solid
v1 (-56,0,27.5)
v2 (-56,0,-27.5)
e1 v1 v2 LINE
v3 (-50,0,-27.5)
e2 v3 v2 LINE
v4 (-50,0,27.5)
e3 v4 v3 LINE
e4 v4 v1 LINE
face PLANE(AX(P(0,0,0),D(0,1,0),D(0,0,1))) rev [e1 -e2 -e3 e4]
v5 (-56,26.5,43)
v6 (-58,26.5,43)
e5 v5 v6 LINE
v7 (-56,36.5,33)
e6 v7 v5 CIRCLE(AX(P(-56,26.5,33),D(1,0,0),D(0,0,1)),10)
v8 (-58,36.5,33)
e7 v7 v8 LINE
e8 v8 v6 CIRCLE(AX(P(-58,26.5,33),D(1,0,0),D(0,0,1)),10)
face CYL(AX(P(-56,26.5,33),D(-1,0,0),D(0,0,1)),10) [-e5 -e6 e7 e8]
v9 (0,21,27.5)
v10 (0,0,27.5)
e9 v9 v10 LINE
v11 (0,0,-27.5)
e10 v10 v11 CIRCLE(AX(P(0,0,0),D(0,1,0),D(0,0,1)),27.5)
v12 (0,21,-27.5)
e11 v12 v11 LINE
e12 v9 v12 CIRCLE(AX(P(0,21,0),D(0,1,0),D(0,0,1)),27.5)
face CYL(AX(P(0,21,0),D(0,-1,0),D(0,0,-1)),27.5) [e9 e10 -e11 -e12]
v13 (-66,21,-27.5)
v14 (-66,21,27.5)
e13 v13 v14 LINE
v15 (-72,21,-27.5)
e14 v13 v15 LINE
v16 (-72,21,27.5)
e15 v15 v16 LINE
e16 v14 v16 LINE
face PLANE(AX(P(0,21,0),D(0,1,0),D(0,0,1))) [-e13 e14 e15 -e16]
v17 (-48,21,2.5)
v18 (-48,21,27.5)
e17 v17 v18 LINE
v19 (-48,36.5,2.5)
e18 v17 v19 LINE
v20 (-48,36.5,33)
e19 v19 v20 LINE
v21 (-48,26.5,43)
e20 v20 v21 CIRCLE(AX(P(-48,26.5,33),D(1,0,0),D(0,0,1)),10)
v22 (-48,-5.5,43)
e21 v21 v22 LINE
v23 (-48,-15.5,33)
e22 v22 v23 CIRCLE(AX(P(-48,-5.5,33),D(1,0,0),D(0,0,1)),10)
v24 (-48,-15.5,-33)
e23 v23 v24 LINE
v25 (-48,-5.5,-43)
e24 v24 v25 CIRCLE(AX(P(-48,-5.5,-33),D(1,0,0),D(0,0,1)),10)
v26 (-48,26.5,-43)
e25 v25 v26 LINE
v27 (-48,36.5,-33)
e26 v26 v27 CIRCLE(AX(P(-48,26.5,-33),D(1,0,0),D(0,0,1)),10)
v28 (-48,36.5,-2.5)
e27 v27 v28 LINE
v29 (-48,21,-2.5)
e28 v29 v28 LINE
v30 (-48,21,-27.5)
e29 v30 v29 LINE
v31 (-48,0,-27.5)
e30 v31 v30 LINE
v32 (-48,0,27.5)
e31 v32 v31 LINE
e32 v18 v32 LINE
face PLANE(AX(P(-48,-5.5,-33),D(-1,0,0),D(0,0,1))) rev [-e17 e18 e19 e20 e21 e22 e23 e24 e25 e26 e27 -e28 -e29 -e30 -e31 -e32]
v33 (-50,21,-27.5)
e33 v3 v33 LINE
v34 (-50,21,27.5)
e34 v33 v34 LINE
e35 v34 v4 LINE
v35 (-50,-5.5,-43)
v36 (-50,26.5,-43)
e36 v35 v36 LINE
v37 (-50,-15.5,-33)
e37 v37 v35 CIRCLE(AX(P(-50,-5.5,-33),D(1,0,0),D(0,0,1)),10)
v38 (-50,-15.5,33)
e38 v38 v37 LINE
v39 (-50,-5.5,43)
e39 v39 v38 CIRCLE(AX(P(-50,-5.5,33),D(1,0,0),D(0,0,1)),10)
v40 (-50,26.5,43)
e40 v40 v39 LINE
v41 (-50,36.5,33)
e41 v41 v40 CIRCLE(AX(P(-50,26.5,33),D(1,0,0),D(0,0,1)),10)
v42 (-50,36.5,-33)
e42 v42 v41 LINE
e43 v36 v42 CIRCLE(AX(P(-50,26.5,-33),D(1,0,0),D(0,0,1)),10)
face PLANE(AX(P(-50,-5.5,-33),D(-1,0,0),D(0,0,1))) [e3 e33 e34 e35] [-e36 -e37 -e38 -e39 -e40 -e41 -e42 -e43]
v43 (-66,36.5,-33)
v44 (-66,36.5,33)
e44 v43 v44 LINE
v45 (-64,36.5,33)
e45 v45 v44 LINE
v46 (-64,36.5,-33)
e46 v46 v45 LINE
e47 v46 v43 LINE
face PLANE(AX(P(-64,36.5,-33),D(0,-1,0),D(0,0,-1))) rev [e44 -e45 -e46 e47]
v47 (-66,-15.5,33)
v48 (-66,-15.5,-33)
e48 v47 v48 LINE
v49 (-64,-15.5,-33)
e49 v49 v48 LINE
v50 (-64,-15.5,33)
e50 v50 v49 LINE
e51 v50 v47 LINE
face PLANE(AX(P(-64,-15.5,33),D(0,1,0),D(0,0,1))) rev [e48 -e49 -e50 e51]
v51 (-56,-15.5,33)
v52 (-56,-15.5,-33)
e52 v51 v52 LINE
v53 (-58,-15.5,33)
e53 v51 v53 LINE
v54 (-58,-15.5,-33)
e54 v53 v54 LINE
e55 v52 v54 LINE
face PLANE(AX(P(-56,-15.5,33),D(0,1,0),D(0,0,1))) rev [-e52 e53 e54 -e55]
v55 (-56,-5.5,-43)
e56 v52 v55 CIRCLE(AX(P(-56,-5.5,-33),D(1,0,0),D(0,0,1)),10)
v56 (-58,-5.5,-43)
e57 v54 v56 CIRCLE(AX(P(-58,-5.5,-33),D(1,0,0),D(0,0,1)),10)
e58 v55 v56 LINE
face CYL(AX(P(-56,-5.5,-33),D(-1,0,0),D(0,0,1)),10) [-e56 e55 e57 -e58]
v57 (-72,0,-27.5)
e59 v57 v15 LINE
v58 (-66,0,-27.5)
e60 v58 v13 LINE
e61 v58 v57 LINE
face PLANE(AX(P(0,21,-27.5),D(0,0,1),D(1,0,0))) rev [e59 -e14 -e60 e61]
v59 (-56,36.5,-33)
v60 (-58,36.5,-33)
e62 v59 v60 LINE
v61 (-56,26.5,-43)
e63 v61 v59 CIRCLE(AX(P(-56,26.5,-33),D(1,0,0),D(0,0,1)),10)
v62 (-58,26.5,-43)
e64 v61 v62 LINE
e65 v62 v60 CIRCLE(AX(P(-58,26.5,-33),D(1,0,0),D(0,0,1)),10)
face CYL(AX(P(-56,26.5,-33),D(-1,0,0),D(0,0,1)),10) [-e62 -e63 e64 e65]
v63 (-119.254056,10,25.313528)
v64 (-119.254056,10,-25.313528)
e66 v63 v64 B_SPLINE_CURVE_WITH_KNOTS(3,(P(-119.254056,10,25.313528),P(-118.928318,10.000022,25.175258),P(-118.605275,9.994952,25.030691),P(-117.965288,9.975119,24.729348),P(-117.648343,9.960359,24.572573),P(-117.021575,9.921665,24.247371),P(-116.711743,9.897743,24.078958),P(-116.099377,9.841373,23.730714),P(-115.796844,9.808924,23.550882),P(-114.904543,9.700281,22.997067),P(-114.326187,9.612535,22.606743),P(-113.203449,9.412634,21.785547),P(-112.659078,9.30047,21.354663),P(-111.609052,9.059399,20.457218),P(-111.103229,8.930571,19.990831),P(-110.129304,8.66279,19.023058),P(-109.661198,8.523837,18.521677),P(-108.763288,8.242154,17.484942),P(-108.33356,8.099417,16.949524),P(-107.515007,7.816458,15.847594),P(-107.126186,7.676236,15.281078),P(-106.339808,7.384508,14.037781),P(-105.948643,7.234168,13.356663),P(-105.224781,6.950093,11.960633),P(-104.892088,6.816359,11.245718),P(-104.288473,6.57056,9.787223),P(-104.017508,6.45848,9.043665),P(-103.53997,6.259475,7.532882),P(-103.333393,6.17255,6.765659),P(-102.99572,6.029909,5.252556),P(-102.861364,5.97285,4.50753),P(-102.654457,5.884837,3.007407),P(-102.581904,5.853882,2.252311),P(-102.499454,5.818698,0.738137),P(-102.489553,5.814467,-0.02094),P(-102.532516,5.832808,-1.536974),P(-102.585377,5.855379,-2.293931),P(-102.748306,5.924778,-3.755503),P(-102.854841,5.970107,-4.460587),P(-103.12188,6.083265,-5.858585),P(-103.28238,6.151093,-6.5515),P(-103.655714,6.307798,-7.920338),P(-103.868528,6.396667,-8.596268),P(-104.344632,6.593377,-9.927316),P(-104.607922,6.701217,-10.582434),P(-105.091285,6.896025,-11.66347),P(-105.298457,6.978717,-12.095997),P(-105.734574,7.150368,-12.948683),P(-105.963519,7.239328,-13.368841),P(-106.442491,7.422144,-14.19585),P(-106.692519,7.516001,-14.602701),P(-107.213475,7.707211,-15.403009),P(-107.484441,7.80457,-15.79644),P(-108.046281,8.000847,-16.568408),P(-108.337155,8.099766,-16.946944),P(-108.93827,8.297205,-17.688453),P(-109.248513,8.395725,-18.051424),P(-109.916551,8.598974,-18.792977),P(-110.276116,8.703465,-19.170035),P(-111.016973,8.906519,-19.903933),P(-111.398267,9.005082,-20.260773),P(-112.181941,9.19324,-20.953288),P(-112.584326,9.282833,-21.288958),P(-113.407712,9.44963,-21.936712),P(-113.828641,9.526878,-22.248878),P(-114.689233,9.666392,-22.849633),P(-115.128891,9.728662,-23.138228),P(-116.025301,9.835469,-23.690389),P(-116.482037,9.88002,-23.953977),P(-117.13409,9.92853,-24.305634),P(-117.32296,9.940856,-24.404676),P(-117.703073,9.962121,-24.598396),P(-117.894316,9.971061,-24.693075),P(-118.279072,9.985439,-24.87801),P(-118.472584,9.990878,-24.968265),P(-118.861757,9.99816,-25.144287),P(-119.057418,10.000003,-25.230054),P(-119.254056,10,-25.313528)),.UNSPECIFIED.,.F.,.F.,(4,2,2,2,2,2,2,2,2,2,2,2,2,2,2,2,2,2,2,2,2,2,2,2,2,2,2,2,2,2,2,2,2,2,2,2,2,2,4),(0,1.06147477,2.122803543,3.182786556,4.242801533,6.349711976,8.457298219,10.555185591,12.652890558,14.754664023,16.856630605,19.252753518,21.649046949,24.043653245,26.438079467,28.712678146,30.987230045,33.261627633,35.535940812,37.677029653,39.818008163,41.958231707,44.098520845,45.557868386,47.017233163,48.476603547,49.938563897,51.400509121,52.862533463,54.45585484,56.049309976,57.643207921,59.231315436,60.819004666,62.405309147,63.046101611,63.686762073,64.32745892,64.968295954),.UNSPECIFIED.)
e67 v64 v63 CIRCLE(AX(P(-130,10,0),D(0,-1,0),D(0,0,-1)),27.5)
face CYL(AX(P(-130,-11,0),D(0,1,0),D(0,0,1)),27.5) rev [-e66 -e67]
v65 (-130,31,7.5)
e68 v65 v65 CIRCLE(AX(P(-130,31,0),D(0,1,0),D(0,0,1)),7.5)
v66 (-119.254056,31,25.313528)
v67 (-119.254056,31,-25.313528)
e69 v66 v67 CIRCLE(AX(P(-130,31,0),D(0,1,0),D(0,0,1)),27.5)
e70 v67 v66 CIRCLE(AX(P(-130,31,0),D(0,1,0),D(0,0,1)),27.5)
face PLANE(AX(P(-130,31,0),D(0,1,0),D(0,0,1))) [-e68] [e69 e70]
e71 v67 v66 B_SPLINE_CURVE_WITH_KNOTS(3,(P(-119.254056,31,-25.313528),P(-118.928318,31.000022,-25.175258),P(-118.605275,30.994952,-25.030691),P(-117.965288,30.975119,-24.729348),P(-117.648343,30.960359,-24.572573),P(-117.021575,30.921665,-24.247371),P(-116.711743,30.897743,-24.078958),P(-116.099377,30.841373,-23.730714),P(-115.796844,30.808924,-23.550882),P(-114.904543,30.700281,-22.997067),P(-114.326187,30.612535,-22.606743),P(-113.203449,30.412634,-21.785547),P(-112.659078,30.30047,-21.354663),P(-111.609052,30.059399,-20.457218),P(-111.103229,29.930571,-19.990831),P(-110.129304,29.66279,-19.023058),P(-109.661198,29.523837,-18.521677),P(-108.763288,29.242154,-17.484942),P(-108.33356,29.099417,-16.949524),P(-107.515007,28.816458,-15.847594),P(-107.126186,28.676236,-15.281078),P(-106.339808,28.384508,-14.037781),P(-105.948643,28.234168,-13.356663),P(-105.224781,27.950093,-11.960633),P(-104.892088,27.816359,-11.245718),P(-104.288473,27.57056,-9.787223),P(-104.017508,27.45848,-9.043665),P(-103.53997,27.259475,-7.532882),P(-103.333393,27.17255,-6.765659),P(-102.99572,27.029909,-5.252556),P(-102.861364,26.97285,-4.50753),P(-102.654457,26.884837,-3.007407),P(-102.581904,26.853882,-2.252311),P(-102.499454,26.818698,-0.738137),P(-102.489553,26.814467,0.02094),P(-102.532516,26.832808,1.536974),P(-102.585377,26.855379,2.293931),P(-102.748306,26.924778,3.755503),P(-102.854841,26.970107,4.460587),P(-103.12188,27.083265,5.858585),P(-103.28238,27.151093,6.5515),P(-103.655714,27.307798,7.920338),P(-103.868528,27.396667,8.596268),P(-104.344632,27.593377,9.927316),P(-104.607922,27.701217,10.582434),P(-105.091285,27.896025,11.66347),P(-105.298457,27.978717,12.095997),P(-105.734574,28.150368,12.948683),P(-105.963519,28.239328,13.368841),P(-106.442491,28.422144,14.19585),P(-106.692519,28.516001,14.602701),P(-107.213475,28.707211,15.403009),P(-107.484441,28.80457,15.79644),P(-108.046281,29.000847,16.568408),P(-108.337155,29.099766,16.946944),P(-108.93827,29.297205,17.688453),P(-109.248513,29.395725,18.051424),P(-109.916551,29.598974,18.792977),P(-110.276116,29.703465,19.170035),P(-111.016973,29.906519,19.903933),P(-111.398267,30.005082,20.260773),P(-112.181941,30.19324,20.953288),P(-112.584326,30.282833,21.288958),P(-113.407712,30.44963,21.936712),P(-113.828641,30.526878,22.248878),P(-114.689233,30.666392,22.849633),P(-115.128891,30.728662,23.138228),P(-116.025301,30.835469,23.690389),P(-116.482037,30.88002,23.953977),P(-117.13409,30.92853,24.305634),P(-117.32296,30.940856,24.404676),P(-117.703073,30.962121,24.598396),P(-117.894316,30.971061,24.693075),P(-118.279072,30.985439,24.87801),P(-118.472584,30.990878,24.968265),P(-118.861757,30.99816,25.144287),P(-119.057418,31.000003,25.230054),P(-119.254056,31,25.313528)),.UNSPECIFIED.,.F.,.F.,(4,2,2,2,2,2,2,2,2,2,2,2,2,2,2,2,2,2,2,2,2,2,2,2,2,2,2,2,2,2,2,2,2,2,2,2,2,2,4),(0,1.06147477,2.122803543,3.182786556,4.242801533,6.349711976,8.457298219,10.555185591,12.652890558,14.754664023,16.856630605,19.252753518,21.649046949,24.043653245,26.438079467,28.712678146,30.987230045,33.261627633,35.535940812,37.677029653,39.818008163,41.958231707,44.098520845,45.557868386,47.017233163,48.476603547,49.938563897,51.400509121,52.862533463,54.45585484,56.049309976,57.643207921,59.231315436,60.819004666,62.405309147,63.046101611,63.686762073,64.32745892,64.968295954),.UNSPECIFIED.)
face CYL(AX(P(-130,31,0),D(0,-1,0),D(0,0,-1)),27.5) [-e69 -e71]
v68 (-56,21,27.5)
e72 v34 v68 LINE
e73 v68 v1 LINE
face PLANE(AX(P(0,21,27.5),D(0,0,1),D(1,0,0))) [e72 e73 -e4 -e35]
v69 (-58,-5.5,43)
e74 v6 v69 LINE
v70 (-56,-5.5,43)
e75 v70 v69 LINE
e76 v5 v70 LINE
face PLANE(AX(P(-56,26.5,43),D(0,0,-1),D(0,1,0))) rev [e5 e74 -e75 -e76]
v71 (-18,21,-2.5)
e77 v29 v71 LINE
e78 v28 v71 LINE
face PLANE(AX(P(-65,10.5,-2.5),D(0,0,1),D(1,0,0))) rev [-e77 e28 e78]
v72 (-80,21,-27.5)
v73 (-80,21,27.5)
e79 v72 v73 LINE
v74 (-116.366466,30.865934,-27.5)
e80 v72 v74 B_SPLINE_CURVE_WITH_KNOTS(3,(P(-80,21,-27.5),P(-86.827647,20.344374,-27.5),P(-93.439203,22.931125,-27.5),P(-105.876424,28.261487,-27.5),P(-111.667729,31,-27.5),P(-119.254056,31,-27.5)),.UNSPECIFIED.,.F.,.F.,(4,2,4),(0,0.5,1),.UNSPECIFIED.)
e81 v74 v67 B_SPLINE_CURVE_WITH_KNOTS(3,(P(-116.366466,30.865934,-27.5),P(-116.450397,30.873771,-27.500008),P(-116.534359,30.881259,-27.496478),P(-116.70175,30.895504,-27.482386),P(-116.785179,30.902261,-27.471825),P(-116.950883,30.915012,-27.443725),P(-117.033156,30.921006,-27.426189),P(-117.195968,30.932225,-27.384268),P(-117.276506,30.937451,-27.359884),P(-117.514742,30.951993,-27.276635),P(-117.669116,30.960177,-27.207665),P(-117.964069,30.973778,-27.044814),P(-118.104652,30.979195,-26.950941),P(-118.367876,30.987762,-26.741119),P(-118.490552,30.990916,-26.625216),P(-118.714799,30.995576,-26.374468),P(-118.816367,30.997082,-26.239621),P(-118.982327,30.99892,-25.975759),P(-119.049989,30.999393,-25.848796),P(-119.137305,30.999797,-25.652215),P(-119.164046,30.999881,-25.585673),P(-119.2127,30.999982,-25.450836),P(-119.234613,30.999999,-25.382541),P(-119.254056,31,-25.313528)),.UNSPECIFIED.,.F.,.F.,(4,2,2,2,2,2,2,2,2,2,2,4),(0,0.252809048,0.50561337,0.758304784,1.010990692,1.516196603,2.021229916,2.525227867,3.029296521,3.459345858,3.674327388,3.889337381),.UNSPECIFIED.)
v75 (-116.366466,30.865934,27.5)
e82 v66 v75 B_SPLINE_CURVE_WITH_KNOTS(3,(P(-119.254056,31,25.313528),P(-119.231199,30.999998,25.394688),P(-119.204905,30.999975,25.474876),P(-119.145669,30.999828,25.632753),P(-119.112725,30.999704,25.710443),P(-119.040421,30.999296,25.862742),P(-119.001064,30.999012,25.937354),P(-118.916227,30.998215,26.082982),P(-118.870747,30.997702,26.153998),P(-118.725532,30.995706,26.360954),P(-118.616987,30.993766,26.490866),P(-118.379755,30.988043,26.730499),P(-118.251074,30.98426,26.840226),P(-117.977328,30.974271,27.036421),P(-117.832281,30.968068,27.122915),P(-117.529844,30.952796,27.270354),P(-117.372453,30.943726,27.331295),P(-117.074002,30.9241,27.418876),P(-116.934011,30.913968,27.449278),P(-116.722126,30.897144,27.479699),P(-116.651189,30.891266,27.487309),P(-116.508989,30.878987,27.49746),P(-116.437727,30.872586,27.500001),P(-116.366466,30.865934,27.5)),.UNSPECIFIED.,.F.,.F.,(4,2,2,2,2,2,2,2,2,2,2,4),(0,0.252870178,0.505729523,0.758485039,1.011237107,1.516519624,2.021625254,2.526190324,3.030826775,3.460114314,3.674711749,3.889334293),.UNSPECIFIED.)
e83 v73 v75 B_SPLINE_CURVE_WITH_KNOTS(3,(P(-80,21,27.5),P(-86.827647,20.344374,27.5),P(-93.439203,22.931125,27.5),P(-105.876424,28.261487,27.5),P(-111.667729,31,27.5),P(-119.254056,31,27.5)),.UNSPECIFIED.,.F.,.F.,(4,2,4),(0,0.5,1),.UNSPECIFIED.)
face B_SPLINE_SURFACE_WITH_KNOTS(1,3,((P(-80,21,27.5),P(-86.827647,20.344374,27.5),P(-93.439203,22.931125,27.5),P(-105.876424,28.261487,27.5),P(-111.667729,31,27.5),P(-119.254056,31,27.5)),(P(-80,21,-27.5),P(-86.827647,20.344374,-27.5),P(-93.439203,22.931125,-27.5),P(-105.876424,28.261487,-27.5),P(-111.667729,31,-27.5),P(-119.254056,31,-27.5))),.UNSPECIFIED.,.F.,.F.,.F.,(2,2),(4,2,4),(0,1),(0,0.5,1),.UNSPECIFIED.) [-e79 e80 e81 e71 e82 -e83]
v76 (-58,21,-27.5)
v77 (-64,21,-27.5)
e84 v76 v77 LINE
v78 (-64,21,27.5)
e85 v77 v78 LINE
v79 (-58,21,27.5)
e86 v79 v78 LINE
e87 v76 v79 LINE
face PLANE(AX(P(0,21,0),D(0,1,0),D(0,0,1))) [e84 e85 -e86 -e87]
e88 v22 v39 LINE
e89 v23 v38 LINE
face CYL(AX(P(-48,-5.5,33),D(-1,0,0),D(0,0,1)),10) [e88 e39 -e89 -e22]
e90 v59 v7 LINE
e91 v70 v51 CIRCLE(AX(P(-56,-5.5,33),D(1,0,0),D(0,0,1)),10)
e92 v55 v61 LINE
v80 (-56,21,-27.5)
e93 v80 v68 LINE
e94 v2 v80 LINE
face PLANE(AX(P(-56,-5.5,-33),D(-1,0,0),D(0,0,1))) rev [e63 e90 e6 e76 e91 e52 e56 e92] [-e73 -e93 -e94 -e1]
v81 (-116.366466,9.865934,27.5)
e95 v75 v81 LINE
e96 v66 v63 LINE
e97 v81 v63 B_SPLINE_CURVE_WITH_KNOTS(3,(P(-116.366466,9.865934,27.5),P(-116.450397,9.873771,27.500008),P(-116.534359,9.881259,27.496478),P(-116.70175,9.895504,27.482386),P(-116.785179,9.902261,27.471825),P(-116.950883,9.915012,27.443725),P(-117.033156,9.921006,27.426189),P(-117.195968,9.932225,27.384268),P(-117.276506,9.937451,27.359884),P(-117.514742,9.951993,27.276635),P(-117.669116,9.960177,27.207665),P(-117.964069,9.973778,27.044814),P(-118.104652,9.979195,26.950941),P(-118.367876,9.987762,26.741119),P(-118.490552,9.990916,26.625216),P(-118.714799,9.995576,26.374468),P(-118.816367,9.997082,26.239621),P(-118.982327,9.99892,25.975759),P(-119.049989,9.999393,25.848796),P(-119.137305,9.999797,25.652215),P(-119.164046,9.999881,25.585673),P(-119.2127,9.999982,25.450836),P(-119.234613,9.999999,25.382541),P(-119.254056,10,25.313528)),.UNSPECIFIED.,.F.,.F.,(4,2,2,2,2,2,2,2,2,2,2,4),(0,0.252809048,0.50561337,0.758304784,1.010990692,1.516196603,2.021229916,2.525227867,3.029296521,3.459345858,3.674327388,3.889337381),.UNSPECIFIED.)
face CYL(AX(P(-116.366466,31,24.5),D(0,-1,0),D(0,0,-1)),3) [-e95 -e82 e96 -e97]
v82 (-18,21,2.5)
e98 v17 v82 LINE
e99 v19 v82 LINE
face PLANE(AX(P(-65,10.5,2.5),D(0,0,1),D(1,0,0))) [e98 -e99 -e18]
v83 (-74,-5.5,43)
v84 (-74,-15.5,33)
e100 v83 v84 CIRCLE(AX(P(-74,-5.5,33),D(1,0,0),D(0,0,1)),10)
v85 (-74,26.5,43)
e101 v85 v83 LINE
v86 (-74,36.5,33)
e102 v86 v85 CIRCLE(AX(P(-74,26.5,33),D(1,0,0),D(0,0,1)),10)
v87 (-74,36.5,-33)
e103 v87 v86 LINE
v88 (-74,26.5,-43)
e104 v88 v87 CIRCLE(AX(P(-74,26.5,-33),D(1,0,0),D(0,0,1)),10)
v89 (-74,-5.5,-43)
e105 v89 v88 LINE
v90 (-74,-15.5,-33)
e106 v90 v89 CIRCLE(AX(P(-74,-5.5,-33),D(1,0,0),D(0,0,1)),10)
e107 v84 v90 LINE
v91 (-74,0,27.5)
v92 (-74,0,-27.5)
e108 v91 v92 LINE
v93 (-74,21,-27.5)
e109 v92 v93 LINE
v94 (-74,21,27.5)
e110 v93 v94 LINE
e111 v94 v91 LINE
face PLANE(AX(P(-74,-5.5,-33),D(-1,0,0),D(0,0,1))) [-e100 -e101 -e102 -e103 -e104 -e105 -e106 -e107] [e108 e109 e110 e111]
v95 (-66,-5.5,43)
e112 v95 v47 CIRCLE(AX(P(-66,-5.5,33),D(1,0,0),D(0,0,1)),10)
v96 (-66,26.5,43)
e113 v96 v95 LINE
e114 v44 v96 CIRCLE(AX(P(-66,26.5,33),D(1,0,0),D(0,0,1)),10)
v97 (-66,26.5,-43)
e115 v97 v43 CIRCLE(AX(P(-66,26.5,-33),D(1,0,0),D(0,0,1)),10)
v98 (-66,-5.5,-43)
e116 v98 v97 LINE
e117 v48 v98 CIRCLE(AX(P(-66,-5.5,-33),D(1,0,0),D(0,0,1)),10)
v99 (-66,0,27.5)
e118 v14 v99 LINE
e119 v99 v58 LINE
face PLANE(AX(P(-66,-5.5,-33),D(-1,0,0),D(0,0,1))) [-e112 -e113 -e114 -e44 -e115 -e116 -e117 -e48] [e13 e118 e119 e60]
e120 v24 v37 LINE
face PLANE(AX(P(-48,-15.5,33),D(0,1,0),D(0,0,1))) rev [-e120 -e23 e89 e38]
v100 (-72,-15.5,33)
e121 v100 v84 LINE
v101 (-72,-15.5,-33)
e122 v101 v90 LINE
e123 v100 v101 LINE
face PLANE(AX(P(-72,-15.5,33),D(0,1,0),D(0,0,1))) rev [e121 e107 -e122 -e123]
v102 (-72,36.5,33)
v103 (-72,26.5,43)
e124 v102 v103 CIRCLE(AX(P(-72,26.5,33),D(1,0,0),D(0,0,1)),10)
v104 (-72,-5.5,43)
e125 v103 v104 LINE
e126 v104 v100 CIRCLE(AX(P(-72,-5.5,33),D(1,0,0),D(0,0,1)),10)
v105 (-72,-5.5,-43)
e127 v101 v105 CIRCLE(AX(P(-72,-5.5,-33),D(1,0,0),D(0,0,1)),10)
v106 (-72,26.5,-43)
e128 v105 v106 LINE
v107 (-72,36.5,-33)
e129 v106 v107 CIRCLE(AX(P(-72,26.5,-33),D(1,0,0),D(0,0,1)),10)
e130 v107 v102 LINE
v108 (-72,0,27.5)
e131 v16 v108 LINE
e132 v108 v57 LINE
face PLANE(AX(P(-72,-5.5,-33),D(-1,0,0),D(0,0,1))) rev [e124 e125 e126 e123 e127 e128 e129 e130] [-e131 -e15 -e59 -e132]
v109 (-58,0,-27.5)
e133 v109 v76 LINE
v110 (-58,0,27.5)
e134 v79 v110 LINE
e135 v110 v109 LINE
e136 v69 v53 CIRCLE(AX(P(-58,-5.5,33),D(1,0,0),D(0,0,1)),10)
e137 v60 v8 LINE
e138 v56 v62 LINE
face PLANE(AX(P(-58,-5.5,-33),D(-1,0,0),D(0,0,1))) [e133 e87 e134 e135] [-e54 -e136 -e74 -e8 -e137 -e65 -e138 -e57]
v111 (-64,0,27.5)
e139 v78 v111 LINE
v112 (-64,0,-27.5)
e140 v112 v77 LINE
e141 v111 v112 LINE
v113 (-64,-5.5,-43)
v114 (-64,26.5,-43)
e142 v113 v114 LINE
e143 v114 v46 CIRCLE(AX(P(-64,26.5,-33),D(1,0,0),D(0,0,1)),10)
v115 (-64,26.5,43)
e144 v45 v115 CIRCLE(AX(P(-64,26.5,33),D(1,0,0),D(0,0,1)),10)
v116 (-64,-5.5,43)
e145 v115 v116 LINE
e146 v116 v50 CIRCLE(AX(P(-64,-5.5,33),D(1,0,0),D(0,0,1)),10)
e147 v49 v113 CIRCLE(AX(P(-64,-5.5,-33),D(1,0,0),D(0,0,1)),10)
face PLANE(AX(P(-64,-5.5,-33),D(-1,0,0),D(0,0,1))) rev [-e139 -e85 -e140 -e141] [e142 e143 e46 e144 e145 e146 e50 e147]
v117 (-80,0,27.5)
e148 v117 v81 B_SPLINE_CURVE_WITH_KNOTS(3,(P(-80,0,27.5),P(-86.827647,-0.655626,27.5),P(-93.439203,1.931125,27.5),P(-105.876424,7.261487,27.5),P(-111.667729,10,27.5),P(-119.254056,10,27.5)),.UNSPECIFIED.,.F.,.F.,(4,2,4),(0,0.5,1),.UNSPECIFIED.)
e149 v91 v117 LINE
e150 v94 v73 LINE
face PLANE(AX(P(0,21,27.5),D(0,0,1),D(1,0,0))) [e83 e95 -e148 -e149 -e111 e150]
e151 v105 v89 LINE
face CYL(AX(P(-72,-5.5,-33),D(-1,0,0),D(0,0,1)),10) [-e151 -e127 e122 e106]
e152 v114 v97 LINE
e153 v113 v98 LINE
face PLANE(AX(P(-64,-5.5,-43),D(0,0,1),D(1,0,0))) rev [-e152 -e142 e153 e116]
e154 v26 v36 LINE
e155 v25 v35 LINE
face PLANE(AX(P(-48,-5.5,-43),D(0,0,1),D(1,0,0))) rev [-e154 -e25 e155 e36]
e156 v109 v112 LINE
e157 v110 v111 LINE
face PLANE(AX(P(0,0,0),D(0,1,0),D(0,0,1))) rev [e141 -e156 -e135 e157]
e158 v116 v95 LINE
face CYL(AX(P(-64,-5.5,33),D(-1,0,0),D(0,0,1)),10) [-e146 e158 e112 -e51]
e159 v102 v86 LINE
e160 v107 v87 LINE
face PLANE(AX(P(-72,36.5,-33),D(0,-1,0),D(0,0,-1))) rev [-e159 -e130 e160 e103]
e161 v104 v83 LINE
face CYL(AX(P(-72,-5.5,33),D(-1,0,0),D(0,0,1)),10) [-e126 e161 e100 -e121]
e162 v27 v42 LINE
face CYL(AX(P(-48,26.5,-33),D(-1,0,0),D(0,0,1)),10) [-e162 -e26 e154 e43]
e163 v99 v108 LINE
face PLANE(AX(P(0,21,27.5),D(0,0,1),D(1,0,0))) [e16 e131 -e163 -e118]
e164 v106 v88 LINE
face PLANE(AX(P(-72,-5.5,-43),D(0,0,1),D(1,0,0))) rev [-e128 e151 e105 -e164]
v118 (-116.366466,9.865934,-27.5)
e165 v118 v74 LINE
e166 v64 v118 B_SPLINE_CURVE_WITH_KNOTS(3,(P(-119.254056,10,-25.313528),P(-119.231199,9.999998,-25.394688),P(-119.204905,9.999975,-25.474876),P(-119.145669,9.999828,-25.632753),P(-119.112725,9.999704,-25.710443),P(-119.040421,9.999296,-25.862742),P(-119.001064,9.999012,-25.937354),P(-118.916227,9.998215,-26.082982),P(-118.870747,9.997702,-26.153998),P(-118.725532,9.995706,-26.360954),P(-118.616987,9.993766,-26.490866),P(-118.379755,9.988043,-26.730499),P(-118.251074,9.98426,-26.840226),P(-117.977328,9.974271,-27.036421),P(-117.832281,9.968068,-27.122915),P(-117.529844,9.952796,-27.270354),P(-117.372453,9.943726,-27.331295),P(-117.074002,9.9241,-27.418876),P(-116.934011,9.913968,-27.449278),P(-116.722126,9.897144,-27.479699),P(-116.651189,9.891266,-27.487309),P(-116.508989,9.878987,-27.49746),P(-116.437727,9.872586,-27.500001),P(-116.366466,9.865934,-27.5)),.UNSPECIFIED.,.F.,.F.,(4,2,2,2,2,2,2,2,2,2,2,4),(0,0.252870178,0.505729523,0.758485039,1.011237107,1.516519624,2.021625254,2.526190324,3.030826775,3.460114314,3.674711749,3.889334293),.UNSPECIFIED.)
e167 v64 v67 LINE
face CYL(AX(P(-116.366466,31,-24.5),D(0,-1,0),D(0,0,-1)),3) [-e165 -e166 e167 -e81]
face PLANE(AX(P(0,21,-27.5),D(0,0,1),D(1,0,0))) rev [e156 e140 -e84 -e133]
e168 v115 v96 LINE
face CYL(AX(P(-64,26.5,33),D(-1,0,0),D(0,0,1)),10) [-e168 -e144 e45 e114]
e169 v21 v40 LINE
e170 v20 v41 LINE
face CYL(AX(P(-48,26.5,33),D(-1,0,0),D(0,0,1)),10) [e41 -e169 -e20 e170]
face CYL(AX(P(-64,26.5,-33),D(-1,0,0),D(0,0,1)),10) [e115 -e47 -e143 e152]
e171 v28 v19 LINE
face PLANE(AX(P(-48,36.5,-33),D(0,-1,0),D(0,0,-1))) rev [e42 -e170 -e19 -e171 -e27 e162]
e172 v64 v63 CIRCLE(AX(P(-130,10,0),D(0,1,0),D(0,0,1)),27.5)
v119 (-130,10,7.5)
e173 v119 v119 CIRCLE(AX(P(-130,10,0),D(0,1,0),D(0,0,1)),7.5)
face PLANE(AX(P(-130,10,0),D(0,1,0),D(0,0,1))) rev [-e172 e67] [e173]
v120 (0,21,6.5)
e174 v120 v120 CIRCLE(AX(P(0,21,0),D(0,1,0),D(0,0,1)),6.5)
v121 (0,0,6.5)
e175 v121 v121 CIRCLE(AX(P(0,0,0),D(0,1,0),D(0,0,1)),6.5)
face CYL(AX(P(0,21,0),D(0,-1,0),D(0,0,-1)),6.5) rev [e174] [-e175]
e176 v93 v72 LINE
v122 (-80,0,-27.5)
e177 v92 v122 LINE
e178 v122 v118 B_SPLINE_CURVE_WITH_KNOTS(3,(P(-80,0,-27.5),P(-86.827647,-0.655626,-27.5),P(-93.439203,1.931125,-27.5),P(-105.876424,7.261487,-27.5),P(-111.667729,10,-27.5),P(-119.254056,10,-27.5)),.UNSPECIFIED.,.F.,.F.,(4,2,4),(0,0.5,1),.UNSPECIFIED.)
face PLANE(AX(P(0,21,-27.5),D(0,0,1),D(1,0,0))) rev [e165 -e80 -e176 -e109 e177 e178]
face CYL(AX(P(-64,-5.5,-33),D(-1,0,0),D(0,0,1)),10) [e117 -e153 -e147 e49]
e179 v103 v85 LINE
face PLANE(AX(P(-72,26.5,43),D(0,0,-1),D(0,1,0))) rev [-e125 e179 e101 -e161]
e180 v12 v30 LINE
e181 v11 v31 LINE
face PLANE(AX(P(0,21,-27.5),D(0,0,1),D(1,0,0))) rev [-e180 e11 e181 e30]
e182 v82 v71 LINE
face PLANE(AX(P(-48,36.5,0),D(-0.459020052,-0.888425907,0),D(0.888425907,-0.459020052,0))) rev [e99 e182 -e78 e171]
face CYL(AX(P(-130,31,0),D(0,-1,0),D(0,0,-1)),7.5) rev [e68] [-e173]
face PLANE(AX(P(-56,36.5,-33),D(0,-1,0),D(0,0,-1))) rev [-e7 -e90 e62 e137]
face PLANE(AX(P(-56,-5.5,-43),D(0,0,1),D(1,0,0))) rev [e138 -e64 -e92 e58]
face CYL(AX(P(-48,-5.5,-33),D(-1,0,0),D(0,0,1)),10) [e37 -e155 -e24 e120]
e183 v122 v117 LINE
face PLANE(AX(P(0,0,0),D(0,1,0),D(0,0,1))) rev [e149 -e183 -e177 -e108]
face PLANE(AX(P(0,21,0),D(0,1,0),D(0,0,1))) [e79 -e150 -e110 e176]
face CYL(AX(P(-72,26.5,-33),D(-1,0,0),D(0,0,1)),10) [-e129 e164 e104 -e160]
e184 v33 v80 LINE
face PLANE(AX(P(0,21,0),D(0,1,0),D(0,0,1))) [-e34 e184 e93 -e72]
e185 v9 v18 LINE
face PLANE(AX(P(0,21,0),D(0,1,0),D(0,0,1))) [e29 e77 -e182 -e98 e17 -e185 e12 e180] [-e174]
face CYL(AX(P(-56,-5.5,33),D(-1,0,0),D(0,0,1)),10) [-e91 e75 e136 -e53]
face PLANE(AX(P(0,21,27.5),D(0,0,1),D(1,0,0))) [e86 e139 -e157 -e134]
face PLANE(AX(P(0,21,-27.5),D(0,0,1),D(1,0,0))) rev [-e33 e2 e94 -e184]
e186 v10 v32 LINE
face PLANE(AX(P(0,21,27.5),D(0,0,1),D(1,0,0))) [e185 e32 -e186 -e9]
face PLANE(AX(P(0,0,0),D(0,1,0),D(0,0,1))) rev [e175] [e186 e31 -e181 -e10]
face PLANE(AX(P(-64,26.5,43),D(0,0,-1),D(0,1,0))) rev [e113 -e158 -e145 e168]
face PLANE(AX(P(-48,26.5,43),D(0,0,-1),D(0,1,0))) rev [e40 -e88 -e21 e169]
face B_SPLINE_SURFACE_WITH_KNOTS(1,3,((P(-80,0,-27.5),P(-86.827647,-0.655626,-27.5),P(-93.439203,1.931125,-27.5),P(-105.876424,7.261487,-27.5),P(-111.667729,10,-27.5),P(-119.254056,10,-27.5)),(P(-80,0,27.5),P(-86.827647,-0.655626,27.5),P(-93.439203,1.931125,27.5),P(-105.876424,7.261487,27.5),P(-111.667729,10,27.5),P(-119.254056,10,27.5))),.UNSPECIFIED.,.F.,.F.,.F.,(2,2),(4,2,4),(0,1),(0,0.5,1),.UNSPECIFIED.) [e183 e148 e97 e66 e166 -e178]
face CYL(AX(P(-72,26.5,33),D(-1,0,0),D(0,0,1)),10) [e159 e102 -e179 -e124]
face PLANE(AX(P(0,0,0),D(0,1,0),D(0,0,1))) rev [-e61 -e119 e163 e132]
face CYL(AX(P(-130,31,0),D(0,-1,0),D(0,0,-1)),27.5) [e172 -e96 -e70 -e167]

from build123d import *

# Parameters (mm, degrees)
SKETCH1_R           = 6.5
BOSS_EXTRUDE1_DEPTH = 21
BOSS_EXTRUDE2_START = -50
SKETCH3_W           = 55
SKETCH3_H           = 21
BOSS_EXTRUDE2_DEPTH = 2
LPATTERN1_COUNT     = 4
LPATTERN1_PITCH     = 8
SKETCH4_R           = 27.5
SKETCH4_R_2         = 7.5
BOSS_EXTRUDE3_DEPTH = 21
SWEEP1_START        = -27.5
SWEEP1_DEPTH        = 55
FILLET1_R           = 3
CUT_EXTRUDE1_START  = 21
CUT_EXTRUDE1_DEPTH  = 21
RIB4_REACH          = 169.295
SKETCH9_WALL_W      = 370.356888496
SKETCH9_WALL_H      = 5


# Read off the part's stored shape, not the designer's step: Sweep1
with BuildPart() as part:
    # Sketch1 → Boss-Extrude1 (new body)
    with BuildSketch(Plane(origin=(0, 0, 0), x_dir=(1, 0, 0), z_dir=(0, 1, 0))):
        with BuildLine():
            Line((0, 27.5), (-80, 27.5))
            Line((-80, 27.5), (-80, -27.5))
            Line((-80, -27.5), (0, -27.5))
            ThreePointArc((0, -27.5), (27.5, 0), (0, 27.5))
        make_face()
        with Locations(Location((0, 0, 0), (0, 0, 90))):
            Circle(SKETCH1_R, mode=Mode.SUBTRACT)
    extrude(amount=BOSS_EXTRUDE1_DEPTH)


with BuildPart() as body_2:
    # Sketch3 → Boss-Extrude2 (new body)
    with BuildSketch(Plane(origin=(0, 0, 0), x_dir=(0, 0, -1), z_dir=(1, 0, 0)).offset(BOSS_EXTRUDE2_START)):
        with BuildLine():
            Line((-33, -15.5), (33, -15.5))
            ThreePointArc((33, -15.5), (40.071067812, -12.571067812), (43, -5.5))
            Line((43, -5.5), (43, 26.5))
            ThreePointArc((43, 26.5), (40.071067812, 33.571067812), (33, 36.5))
            Line((33, 36.5), (-33, 36.5))
            ThreePointArc((-33, 36.5), (-40.071067812, 33.571067812), (-43, 26.5))
            Line((-43, 26.5), (-43, -5.5))
            ThreePointArc((-43, -5.5), (-40.071067812, -12.571067812), (-33, -15.5))
        make_face()
        with Locations((0, 10.5)):
            Rectangle(SKETCH3_W, SKETCH3_H, mode=Mode.SUBTRACT)
    boss_extrude2 = extrude(amount=BOSS_EXTRUDE2_DEPTH)


with BuildPart() as part_1:
    add(part.part)

    # LPattern1: Boss-Extrude2 ×4
    with Locations(*[(-i * LPATTERN1_PITCH, 0, 0) for i in range(1, LPATTERN1_COUNT)]):
        add(boss_extrude2)



with BuildPart() as body_3:
    # Sketch4 → Boss-Extrude3 (new body)
    with BuildSketch(Plane(origin=(0, 10, 0), x_dir=(1, 0, 0), z_dir=(0, 1, 0))):
        with Locations(Location((-130, 0, 0), (0, 0, 90))):
            Circle(SKETCH4_R)
        with Locations(Location((-130, 0, 0), (0, 0, 90))):
            Circle(SKETCH4_R_2, mode=Mode.SUBTRACT)
    extrude(amount=BOSS_EXTRUDE3_DEPTH)


with BuildPart() as part_2:
    add(part_1.part)

    add(body_3.part)  # Sweep1 merges body 3
    # Sweep1 outline → Sweep1 (add)
    with BuildSketch(Plane.XY.offset(SWEEP1_START)):
        with BuildLine():
            Line((-80, 0), (-80, 21))
            add(Edge.make_bspline(
                [(-80, 21), (-86.827647421, 20.344373746), (-93.439203359, 22.931124684), (-105.876424342, 28.26148667), (-111.667729409, 30.999999996), (-119.254055637, 31)],
                knots=[0, 0, 0, 0, 0.5, 0.5, 1, 1, 1, 1], degree=3))
            Line((-119.254055637, 31), (-119.254055637, 10))
            add(Edge.make_bspline(
                [(-80, 0), (-86.827647421, -0.655626254), (-93.439203359, 1.931124684), (-105.876424342, 7.26148667), (-111.667729409, 9.999999996), (-119.254055637, 10)],
                knots=[0, 0, 0, 0, 0.5, 0.5, 1, 1, 1, 1], degree=3))
        make_face()
    extrude(amount=SWEEP1_DEPTH)

    # Fillet1
    # the kernel refuses this fillet: 3 mm, written as the material it takes off along each edge
    with BuildSketch(Plane(origin=(-119.254055637, 38.218973628, -27.5), x_dir=(0, 0, 1), z_dir=(0, -1, 0))) as fillet1_piece_1_section:
        with BuildLine():
            CenterArc((3, -2.887589451), FILLET1_R, 105.734249822, 74.265750178)
            Line((0, -2.887589451), (-0.06, -2.887589451))
            Line((-0.06, -2.887589451), (-0.06, 0))
            Line((-0.06, 0), (0, 0.06))
            ThreePointArc((0, 0.06), (1.093236198, 0.06), (2.170201844, 0.057751789))
            Line((2.170201844, 0.057751789), (2.186472396, 0))
        make_face()
    fillet1_piece_1 = extrude(amount=35.437947255, mode=Mode.PRIVATE)
    fillet1_piece_1 = fillet1_piece_1 - Plane(origin=(-130, 20.5, 0), x_dir=(0, 0, -1), z_dir=(0, -1, 0)) * Cylinder(27.5, 83, mode=Mode.PRIVATE)
    add(fillet1_piece_1, mode=Mode.SUBTRACT)
    with BuildSketch(Plane(origin=(-119.254055637, 38.218973628, 27.5), x_dir=(0, 0, -1), z_dir=(0, -1, 0))) as fillet1_piece_2_section:
        with BuildLine():
            CenterArc((3, 2.887589451), FILLET1_R, 180, 74.265750178)
            Line((0, 2.887589451), (-0.06, 2.887589451))
            Line((-0.06, 2.887589451), (-0.06, 0))
            Line((-0.06, 0), (0, -0.06))
            ThreePointArc((0, -0.06), (1.093236198, -0.06), (2.170201844, -0.057751789))
            Line((2.170201844, -0.057751789), (2.186472396, 0))
        make_face()
    fillet1_piece_2 = extrude(amount=35.437947255, mode=Mode.PRIVATE)
    fillet1_piece_2 = fillet1_piece_2 - Plane(origin=(-130, 20.5, 0), x_dir=(0, 0, -1), z_dir=(0, -1, 0)) * Cylinder(27.5, 83, mode=Mode.PRIVATE)
    add(fillet1_piece_2, mode=Mode.SUBTRACT)

    # Sketch7 → Cut-Extrude1 (cut)
    with BuildSketch(Plane.XZ.offset(-10).offset(CUT_EXTRUDE1_START)):
        with BuildLine():
            ThreePointArc((-119.254055637, 25.313527604), (-157.5, 0), (-119.254055637, -25.313527604))
            ThreePointArc((-119.254055637, -25.313527604), (-102.5, 0), (-119.254055637, 25.313527604))
        make_face()
    extrude(amount=-CUT_EXTRUDE1_DEPTH, mode=Mode.SUBTRACT)


with BuildPart() as body_2_1:
    add(body_2.part)

    # Combine1: union part
    add(part_2.part)

    # Sketch9 wall → Rib4 (add, up to next)
    with BuildSketch(Plane(origin=(-33, 28.75, 0), x_dir=(0.888425906857, -0.459020051876, 0), z_dir=(0.459020051876, 0.888425906857, 0)), mode=Mode.PRIVATE) as rib4_sk1:
        Rectangle(SKETCH9_WALL_W, SKETCH9_WALL_H)
    rib4_tool1 = extrude(rib4_sk1.sketch, amount=-RIB4_REACH, mode=Mode.PRIVATE) - body_2_1.part
    add(rib4_tool1.solids().sort_by_distance((-33, 28.75, 0))[0])


solid = body_2_1.part
